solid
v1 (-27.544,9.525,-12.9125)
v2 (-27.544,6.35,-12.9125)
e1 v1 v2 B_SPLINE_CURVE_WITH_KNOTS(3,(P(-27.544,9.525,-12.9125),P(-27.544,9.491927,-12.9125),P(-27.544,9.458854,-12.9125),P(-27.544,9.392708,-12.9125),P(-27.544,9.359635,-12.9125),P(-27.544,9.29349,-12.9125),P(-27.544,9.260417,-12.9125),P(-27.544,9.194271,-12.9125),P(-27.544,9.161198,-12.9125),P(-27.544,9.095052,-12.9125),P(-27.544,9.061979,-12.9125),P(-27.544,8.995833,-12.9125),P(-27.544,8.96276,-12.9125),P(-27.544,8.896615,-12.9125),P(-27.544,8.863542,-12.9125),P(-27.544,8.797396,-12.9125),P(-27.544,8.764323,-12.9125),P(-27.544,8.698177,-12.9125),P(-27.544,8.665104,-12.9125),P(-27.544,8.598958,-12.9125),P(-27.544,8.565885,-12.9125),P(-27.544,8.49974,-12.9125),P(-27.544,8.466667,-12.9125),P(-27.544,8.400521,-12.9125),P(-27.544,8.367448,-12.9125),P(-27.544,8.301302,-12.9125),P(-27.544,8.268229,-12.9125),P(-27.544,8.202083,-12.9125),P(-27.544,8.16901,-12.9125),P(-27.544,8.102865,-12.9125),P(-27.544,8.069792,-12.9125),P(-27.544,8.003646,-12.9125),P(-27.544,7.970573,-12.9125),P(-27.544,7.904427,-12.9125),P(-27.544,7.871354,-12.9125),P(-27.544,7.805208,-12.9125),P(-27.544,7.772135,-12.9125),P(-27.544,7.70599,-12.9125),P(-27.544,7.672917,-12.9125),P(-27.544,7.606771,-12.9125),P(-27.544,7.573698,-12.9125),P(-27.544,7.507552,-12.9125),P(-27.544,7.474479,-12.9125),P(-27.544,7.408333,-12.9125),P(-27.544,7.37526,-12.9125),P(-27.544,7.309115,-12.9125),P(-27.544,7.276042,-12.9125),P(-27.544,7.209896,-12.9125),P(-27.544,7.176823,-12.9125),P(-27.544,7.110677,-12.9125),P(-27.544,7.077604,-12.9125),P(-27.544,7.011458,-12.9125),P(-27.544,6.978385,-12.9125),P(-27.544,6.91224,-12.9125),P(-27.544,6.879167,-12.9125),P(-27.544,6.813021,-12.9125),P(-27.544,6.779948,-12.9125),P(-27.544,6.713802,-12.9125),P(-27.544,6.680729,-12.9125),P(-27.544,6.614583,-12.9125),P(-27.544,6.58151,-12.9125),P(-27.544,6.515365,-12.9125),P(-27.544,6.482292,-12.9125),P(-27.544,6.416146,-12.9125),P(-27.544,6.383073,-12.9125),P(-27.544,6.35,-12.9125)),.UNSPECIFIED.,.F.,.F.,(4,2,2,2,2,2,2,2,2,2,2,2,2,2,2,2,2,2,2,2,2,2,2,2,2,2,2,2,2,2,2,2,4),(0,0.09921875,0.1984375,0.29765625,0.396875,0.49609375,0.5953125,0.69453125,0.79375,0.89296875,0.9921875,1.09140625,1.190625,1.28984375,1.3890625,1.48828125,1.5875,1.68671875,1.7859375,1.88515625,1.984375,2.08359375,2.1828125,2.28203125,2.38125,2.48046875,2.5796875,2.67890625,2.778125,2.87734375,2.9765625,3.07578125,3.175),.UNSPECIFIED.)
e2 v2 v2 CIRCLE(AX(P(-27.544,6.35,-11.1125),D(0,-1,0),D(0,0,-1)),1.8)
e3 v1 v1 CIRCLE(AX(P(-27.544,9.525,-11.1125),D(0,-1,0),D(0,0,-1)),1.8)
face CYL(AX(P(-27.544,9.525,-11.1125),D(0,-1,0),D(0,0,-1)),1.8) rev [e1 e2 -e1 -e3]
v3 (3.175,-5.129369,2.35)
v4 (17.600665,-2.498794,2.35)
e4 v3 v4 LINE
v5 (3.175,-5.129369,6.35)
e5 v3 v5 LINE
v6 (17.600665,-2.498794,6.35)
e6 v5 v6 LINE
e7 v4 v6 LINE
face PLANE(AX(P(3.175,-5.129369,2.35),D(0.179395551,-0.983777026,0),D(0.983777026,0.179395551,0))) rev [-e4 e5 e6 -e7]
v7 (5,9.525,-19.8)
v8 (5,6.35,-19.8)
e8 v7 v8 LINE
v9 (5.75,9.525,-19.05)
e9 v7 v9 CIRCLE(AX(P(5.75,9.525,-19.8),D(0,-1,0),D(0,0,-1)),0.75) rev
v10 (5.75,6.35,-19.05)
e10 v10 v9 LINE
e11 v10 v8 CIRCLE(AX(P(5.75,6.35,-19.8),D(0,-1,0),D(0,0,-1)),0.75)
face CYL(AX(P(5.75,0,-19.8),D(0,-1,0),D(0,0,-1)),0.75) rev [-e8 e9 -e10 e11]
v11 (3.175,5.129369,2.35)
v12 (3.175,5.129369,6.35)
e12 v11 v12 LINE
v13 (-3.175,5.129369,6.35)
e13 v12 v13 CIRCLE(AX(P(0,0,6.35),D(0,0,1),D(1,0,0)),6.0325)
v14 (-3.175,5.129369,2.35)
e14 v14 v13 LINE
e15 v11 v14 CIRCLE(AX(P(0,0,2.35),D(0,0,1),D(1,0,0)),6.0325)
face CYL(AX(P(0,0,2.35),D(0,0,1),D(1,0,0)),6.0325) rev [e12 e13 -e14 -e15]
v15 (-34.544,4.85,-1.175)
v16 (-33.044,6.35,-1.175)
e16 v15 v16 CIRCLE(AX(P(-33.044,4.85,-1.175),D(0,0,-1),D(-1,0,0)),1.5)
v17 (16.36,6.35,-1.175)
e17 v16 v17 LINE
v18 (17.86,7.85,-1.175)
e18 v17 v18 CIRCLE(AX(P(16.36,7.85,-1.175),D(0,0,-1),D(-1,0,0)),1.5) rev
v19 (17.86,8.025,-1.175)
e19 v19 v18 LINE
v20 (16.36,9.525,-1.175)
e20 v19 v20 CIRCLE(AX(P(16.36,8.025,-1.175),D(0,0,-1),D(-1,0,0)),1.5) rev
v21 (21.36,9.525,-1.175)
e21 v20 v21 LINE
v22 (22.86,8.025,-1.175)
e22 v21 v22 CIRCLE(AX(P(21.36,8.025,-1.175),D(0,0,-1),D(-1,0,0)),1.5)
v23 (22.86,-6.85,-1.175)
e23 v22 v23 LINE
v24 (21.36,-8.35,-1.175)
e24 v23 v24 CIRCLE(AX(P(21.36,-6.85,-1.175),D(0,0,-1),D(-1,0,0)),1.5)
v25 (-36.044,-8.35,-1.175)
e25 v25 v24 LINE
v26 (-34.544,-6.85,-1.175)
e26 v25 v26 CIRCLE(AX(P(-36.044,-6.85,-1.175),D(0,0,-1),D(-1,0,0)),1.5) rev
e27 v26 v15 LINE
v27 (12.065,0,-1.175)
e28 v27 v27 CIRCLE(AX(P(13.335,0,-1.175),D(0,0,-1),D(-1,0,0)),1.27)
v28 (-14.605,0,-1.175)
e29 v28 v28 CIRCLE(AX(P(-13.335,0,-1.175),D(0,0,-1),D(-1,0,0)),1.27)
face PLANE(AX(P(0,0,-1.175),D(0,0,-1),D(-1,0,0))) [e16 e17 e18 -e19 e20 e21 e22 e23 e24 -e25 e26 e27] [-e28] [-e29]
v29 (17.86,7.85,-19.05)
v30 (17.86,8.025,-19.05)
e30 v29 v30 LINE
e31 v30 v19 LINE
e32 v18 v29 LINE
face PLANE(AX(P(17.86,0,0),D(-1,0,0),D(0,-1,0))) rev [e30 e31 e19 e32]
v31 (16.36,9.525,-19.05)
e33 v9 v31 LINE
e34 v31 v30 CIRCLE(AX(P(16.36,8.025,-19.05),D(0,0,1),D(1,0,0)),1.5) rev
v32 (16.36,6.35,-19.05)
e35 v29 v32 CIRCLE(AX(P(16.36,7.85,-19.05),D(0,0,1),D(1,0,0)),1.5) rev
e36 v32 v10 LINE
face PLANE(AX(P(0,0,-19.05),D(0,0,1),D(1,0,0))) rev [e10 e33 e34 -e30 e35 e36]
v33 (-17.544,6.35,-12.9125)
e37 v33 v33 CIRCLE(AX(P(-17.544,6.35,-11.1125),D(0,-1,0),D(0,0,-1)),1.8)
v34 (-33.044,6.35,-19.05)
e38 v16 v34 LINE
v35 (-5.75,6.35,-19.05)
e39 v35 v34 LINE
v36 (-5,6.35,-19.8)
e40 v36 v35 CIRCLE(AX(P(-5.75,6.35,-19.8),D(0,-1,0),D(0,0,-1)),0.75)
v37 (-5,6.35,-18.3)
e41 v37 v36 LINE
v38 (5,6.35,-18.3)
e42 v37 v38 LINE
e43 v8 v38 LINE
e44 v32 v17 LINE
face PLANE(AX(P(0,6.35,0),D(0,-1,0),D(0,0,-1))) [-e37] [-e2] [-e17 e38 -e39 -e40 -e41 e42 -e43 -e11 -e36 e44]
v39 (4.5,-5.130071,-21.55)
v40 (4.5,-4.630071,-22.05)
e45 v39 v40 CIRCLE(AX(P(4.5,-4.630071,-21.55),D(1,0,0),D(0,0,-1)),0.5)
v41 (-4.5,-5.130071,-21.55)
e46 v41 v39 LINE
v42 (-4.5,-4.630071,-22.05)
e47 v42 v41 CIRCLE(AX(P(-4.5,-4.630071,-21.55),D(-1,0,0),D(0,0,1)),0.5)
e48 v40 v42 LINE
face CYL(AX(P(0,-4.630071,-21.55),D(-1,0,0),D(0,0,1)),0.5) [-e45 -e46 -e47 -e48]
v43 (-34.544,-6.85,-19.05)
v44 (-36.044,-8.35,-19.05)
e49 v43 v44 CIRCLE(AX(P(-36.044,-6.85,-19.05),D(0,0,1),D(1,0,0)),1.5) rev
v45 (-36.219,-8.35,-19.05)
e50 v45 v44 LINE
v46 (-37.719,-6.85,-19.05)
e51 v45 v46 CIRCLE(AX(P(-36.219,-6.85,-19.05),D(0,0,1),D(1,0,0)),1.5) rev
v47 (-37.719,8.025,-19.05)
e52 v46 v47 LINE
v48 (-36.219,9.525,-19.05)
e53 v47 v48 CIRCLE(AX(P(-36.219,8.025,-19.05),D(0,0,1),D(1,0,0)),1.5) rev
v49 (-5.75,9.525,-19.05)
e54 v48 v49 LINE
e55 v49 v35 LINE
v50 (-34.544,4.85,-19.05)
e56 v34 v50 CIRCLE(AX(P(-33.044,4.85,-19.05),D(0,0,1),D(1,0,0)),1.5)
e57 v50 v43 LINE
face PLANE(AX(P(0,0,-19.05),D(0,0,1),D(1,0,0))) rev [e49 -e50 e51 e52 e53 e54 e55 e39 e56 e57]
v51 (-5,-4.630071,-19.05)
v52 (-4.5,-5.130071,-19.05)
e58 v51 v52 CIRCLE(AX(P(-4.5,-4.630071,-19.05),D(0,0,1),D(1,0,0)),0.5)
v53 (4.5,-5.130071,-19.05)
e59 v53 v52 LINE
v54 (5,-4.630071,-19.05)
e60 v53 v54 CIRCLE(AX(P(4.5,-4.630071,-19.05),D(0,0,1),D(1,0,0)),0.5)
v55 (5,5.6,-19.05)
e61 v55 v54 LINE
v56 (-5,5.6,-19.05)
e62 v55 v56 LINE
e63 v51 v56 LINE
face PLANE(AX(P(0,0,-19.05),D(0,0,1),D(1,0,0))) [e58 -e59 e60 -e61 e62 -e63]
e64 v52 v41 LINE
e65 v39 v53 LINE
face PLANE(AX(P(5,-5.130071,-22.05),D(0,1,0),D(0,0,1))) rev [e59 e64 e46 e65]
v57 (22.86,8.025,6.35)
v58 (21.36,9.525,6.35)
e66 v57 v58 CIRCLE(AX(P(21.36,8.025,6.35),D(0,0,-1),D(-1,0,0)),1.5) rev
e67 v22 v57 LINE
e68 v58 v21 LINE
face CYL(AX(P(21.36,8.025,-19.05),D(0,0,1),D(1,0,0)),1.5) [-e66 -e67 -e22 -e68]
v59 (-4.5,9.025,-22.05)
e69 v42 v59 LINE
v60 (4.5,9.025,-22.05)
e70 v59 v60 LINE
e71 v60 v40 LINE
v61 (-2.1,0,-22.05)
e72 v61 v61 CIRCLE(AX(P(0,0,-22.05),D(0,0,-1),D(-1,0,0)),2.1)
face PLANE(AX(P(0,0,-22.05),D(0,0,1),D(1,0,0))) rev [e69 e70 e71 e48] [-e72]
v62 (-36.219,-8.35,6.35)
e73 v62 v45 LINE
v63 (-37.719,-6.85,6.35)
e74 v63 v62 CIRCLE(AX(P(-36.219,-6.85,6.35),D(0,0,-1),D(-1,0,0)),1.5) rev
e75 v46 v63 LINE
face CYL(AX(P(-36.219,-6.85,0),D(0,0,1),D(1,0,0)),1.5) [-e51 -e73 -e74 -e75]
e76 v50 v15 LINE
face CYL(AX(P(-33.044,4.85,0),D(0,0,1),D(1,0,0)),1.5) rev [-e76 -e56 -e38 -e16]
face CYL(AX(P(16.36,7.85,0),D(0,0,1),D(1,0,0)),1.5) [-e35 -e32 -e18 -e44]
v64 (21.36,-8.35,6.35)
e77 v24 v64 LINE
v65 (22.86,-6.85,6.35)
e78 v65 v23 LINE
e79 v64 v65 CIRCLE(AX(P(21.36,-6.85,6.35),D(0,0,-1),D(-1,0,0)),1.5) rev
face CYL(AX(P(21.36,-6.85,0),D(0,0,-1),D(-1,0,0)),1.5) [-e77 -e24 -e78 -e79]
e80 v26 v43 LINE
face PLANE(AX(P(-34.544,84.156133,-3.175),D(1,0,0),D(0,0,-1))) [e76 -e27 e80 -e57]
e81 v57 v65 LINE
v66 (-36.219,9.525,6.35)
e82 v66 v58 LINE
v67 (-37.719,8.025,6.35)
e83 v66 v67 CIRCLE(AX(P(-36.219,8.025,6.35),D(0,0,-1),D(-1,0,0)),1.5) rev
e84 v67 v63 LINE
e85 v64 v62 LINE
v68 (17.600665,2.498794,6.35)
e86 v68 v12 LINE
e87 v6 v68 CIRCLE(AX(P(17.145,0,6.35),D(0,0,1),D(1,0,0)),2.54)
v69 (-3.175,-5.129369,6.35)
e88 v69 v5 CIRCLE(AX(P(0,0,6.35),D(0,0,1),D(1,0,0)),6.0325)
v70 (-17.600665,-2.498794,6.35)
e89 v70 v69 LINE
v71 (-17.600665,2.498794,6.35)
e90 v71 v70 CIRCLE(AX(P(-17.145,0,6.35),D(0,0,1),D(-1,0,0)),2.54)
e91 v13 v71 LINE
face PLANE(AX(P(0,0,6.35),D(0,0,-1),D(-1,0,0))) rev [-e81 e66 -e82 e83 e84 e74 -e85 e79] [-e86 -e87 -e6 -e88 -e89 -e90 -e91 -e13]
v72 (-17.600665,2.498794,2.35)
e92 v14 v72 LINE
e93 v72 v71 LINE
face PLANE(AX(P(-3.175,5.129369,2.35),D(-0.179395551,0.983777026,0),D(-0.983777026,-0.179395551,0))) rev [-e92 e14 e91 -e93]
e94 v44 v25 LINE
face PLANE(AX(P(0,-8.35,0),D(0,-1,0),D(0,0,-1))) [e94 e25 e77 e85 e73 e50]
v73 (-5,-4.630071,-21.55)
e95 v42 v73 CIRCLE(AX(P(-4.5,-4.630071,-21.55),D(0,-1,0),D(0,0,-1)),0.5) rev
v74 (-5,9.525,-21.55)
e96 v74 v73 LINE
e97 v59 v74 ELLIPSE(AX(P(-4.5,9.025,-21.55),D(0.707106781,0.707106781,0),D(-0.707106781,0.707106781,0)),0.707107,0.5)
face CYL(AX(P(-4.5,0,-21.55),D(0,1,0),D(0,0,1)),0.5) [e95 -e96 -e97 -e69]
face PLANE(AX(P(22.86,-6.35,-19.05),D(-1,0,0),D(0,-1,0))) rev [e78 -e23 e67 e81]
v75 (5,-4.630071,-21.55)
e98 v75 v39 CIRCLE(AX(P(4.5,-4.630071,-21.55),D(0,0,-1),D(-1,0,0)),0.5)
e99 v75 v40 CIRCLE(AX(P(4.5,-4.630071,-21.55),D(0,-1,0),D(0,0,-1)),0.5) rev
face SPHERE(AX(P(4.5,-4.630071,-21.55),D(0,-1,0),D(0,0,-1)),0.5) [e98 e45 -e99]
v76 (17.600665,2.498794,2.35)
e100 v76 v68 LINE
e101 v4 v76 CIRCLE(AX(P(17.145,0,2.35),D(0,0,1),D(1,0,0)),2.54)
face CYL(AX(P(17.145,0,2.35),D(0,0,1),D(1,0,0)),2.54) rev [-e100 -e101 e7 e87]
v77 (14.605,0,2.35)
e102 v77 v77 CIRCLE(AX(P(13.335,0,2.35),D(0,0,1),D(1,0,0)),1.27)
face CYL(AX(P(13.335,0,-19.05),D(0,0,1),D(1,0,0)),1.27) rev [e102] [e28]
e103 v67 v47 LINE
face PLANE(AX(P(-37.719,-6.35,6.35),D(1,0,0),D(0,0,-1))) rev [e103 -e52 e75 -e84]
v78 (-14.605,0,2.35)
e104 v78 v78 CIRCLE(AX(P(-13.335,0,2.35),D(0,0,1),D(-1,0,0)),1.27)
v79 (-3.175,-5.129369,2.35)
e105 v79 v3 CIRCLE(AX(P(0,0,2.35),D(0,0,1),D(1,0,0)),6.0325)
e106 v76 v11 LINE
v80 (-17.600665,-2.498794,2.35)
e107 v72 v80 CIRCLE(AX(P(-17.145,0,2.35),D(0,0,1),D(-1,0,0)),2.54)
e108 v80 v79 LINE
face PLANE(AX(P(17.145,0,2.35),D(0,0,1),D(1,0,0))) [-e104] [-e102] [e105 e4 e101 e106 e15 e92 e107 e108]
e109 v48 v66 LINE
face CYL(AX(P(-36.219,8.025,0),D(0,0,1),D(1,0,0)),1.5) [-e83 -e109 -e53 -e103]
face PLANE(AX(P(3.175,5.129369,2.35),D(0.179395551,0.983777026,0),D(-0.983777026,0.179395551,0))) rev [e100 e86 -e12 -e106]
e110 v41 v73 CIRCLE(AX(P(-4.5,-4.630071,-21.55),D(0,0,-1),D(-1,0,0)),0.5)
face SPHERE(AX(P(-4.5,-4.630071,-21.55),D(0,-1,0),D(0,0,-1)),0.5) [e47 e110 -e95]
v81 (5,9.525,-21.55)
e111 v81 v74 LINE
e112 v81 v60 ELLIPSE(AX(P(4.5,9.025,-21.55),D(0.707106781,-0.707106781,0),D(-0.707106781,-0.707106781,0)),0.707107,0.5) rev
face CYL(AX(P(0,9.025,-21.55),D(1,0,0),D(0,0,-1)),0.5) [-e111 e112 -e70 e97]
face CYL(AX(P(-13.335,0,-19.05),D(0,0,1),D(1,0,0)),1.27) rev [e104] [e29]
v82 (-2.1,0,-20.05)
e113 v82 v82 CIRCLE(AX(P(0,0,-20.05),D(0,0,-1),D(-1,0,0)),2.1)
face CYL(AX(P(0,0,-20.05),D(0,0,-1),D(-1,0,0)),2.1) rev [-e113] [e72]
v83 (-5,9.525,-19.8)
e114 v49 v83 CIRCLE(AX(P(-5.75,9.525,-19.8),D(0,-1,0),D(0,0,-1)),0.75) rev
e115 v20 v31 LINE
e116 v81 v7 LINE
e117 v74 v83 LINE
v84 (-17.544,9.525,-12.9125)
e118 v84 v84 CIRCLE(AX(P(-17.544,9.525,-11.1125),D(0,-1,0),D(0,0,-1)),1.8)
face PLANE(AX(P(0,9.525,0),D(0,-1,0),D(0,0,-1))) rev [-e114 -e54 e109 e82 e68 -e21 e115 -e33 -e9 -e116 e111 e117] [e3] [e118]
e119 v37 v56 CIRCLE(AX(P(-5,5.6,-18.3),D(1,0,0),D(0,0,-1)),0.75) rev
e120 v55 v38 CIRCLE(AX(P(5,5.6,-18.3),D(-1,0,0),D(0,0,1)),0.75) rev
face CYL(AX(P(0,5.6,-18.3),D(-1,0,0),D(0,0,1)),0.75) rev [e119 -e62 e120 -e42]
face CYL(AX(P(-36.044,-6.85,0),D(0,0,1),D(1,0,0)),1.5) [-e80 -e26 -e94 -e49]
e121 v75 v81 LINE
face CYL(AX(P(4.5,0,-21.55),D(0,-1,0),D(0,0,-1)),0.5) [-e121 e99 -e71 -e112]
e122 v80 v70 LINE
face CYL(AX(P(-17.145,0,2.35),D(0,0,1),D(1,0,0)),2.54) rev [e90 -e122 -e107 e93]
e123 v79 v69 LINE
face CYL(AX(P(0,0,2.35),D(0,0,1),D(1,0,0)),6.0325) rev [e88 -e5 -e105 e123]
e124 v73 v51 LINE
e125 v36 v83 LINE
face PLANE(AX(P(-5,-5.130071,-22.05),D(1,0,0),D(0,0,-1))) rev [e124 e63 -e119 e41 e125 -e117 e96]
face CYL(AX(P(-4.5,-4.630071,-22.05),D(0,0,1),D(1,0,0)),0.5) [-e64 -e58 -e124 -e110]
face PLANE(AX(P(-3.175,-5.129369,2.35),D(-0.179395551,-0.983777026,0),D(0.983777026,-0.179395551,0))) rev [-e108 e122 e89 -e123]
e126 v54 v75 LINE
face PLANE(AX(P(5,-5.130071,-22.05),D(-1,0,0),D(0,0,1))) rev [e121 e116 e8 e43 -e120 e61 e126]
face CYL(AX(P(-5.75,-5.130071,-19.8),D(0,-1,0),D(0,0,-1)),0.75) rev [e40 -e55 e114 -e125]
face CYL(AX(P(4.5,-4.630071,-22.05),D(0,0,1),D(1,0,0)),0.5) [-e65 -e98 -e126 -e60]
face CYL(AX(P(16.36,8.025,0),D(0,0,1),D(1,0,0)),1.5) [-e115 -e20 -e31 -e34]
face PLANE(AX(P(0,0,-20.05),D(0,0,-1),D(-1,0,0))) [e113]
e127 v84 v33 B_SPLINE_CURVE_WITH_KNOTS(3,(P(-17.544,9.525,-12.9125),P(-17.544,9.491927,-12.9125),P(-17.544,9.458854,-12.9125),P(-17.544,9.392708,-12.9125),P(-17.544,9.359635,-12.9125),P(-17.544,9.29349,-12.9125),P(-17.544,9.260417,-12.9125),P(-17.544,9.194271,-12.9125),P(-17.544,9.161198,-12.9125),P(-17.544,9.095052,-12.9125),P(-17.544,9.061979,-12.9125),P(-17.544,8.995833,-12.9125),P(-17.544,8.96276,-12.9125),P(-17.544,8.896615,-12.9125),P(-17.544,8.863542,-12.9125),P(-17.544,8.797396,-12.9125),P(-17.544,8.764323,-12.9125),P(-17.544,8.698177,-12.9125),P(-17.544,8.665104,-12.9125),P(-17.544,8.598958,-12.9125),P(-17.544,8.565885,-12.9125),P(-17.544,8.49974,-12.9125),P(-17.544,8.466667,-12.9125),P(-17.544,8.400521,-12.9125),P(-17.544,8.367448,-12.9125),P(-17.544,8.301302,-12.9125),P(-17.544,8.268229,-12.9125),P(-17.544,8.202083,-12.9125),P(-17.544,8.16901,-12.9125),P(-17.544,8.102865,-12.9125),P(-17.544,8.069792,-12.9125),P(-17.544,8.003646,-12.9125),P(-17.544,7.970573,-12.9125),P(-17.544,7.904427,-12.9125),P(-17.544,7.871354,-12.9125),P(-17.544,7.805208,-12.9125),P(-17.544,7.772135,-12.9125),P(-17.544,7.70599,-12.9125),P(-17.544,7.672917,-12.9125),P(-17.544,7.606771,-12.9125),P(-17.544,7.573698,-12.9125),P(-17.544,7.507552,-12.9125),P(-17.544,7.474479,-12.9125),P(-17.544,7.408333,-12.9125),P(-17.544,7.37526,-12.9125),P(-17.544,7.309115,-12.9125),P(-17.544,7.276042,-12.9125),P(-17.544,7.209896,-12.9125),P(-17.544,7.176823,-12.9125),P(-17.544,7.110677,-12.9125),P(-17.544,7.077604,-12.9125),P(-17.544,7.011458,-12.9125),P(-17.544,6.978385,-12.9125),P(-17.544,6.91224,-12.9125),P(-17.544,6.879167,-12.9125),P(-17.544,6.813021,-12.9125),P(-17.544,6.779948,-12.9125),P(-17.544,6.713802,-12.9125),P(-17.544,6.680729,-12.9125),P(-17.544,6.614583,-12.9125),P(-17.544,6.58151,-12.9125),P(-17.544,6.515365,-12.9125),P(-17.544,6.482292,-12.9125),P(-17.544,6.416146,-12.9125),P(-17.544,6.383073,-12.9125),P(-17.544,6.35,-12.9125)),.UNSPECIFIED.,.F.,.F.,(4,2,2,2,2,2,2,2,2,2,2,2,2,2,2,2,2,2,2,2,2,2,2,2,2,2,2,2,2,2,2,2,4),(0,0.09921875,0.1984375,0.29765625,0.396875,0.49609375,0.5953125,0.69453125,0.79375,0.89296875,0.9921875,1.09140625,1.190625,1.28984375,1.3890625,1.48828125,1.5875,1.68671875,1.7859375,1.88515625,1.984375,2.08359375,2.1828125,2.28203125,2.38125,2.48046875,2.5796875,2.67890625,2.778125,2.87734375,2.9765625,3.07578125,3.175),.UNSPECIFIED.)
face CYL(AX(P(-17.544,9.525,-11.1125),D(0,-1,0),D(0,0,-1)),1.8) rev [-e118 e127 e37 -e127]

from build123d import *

# Parameters (mm, degrees)
SKETCH1_W                       = 75.438
SKETCH1_H                       = 12.7
BOSS_EXTRUDE1_DEPTH             = 6.35
CUT_EXTRUDE1_DEPTH              = 4
BOSS_EXTRUDE2_REACH             = 40.773
SKETCH3_W                       = 75.438
SKETCH3_H                       = 19.05
SKETCH3_W_2                     = 69.088
SKETCH3_H_2                     = 12.7
BOSS_EXTRUDE2_DIRECTION_2_REACH = 40.773
SKETCH4_W                       = 75.438
SKETCH4_H                       = 25.4
BOSS_EXTRUDE4_DEPTH             = 3.175
SKETCH7_W                       = 14.859
SKETCH7_H                       = 15.875
CUT_EXTRUDE3_DEPTH              = 47.460828512
SKETCH8_W                       = 3.175
SKETCH8_H                       = 15.875
CUT_EXTRUDE4_DEPTH              = 65.214043371
BOSS_EXTRUDE5_DEPTH             = 3.175
SKETCH11_W                      = 57.404
SKETCH11_H                      = 12.7
CUT_EXTRUDE5_DEPTH              = 2
SKETCH12_R                      = 1.27
CUT_EXTRUDE6_DEPTH              = 45.400547136
SKETCH10_R                      = 1.8
CUT_EXTRUDE7_DEPTH              = 45.123864983
SKETCH13_W                      = 17.875
SKETCH13_H                      = 3.175
CUT_EXTRUDE8_DEPTH              = 5
SKETCH14_W                      = 10
SKETCH14_H                      = 14.655071008
BOSS_EXTRUDE6_DEPTH             = 3
SKETCH15_R                      = 2.1
CUT_EXTRUDE9_DEPTH              = 2
BOSS_EXTRUDE7_DEPTH             = 2
FILLET3_R                       = 0.5
FILLET4_R                       = 0.75
FILLET5_R                       = 0.75
FILLET6_R                       = 0.75
FILLET2_R                       = 1.5


with BuildPart() as part:
    # Sketch1 → Boss-Extrude1 (new body)
    with BuildSketch(Plane.XY):
        Rectangle(SKETCH1_W, SKETCH1_H)
    extrude(amount=BOSS_EXTRUDE1_DEPTH)

    # Sketch2 → Cut-Extrude1 (cut)
    with BuildSketch(Plane.XY.offset(6.35)):
        with BuildLine():
            Line((3.175, 5.129369479), (17.6006647, 2.498793645))
            ThreePointArc((17.6006647, 2.498793645), (19.685, 0), (17.6006647, -2.498793645))
            Line((17.6006647, -2.498793645), (3.175, -5.129369479))
            ThreePointArc((3.175, -5.129369479), (0, -6.0325), (-3.175, -5.129369479))
            Line((-3.175, -5.129369479), (-17.6006647, -2.498793645))
            ThreePointArc((-17.6006647, -2.498793645), (-19.685, 0), (-17.6006647, 2.498793645))
            Line((-17.6006647, 2.498793645), (-3.175, 5.129369479))
            ThreePointArc((-3.175, 5.129369479), (0, 6.0325), (3.175, 5.129369479))
        make_face()
    extrude(amount=-CUT_EXTRUDE1_DEPTH, mode=Mode.SUBTRACT)

    # Boss-Extrude2: up to this face of the body (flat: up to its plane)
    boss_extrude2_end = Plane(part.part.faces().sort_by_distance((0, 6.35, 3.175))[0])
    # Sketch3 → Boss-Extrude2 (add, up to the picked face)
    with BuildSketch(Plane(origin=(0, 0, 0), x_dir=(1, 0, 0), z_dir=(0, 1, 0)), mode=Mode.PRIVATE) as boss_extrude2_sk1:
        with Locations((0, 9.525)):
            Rectangle(SKETCH3_W, SKETCH3_H)
        with Locations((0, 9.525)):
            Rectangle(SKETCH3_W_2, SKETCH3_H_2, mode=Mode.SUBTRACT)
    boss_extrude2_tool1 = split(extrude(boss_extrude2_sk1.sketch, amount=BOSS_EXTRUDE2_REACH, mode=Mode.PRIVATE), bisect_by=boss_extrude2_end, keep=Keep.BOTH, mode=Mode.PRIVATE)
    add(boss_extrude2_tool1.solids().sort_by(Axis((0, 0, -0.778061), (0, 1, 0)))[0])

    # Boss-Extrude2 direction 2: up to this face of the body (flat: up to its plane)
    boss_extrude2_direction_2_end = Plane(part.part.faces().sort_by_distance((0, -6.35, 3.175))[0])
    # Sketch3 → Boss-Extrude2 direction 2 (add, up to the picked face)
    with BuildSketch(Plane(origin=(0, 0, 0), x_dir=(1, 0, 0), z_dir=(0, 1, 0)), mode=Mode.PRIVATE) as boss_extrude2_direction_2_sk1:
        with Locations((0, 9.525)):
            Rectangle(SKETCH3_W, SKETCH3_H)
        with Locations((0, 9.525)):
            Rectangle(SKETCH3_W_2, SKETCH3_H_2, mode=Mode.SUBTRACT)
    boss_extrude2_direction_2_tool1 = split(extrude(boss_extrude2_direction_2_sk1.sketch, amount=-BOSS_EXTRUDE2_DIRECTION_2_REACH, mode=Mode.PRIVATE), bisect_by=boss_extrude2_direction_2_end, keep=Keep.BOTH, mode=Mode.PRIVATE)
    add(boss_extrude2_direction_2_tool1.solids().sort_by(Axis((0, 0, -0.778061), (0, -1, 0)))[0])

    # Sketch4 → Boss-Extrude4 (add)
    with BuildSketch(Plane(origin=(0, 6.35, 0), x_dir=(1, 0, 0), z_dir=(0, 1, 0))):
        with Locations((0, 6.35)):
            Rectangle(SKETCH4_W, SKETCH4_H)
    extrude(amount=BOSS_EXTRUDE4_DEPTH)

    # Sketch7 → Cut-Extrude3 (cut, through all)
    with BuildSketch(Plane.XY.offset(6.35)):
        with Locations((30.2895, 1.5875)):
            Rectangle(SKETCH7_W, SKETCH7_H)
    extrude(amount=-CUT_EXTRUDE3_DEPTH, mode=Mode.SUBTRACT)

    # Sketch8 → Cut-Extrude4 (cut, through all)
    with BuildSketch(Plane(origin=(22.86, 0, 0), x_dir=(0, 0, -1), z_dir=(1, 0, 0))):
        with Locations((17.4625, 1.5875)):
            Rectangle(SKETCH8_W, SKETCH8_H)
    extrude(amount=-CUT_EXTRUDE4_DEPTH, mode=Mode.SUBTRACT)

    # Sketch9 → Boss-Extrude5 (add)
    with BuildSketch(Plane(origin=(0, 0, -15.875), x_dir=(-1, 0, 0), z_dir=(0, 0, -1))):
        Polygon((34.544, 6.35), (34.544, -6.35), (37.719, -6.35), (37.719, 9.525), (-22.86, 9.525), (-22.86, 6.35), align=None)
    extrude(amount=BOSS_EXTRUDE5_DEPTH)

    # Sketch11 → Cut-Extrude5 (cut)
    with BuildSketch(Plane(origin=(0, 0, -3.175), x_dir=(-1, 0, 0), z_dir=(0, 0, -1))):
        with Locations((5.842, 0)):
            Rectangle(SKETCH11_W, SKETCH11_H)
    extrude(amount=-CUT_EXTRUDE5_DEPTH, mode=Mode.SUBTRACT)

    # Sketch12 → Cut-Extrude6 (cut, through all)
    with BuildSketch(Plane.XY.offset(2.35)):
        with Locations((13.335, 0)):
            Circle(SKETCH12_R)
        with Locations(Location((-13.335, 0, 0), (0, 0, 180))):
            Circle(SKETCH12_R)
    extrude(amount=-CUT_EXTRUDE6_DEPTH, mode=Mode.SUBTRACT)

    # Sketch10 → Cut-Extrude7 (cut, through all)
    with BuildSketch(Plane.XZ.offset(-6.35)):
        with Locations(Location((-27.544, -11.1125, 0), (0, 0, 270))):
            Circle(SKETCH10_R)
        with Locations(Location((-17.544, -11.1125, 0), (0, 0, 270))):
            Circle(SKETCH10_R)
    extrude(amount=-CUT_EXTRUDE7_DEPTH, mode=Mode.SUBTRACT)

    # Sketch13 → Cut-Extrude8 (cut)
    with BuildSketch(Plane(origin=(22.86, 0, 0), x_dir=(0, 0, -1), z_dir=(1, 0, 0))):
        with Locations((10.1125, 7.9375)):
            Rectangle(SKETCH13_W, SKETCH13_H)
    extrude(amount=-CUT_EXTRUDE8_DEPTH, mode=Mode.SUBTRACT)

    # Sketch14 → Boss-Extrude6 (add)
    with BuildSketch(Plane(origin=(0, 0, -19.05), x_dir=(-1, 0, 0), z_dir=(0, 0, -1))):
        with Locations((0, 2.197464496)):
            Rectangle(SKETCH14_W, SKETCH14_H)
    extrude(amount=BOSS_EXTRUDE6_DEPTH)

    # Sketch15 → Cut-Extrude9 (cut)
    with BuildSketch(Plane(origin=(0, 0, -22.05), x_dir=(-1, 0, 0), z_dir=(0, 0, -1))):
        Circle(SKETCH15_R)
    extrude(amount=-CUT_EXTRUDE9_DEPTH, mode=Mode.SUBTRACT)

    # Sketch16 → Boss-Extrude7 (add)
    with BuildSketch(Plane.XZ.offset(6.35)):
        Polygon((-34.544, -19.05), (-34.544, -1.175), (22.86, -1.175), (22.86, 6.35), (-37.719, 6.35), (-37.719, -19.05), align=None)
    extrude(amount=BOSS_EXTRUDE7_DEPTH)

    # Fillet3
    fillet3_edges = [part.edges().sort_by_distance(p)[0] for p in [
        (-5, -5.130071008, -20.55),
        (5, -5.130071008, -20.55),
        (-5, 2.197464496, -22.05),
        (0, 9.525, -22.05),
        (5, 2.197464496, -22.05),
        (0, -5.130071008, -22.05),
    ]]
    fillet(fillet3_edges, radius=FILLET3_R)

    # Fillet4
    # the kernel refuses this fillet: 0.75 mm, written as the material it adds along each edge
    with BuildSketch(Plane(origin=(5, 9.525, -19.05), x_dir=(0, 0, -1), z_dir=(0, -1, 0))) as fillet4_piece_1:
        with BuildLine():
            CenterArc((FILLET4_R, FILLET4_R), FILLET4_R, 180, 90)
            Line((0, FILLET4_R), (0, 0))
            Line((0, 0), (FILLET4_R, 0))
        make_face()
    extrude(amount=3.175)

    # Fillet5
    # the kernel refuses this fillet: 0.75 mm, written as the material it adds along each edge
    with BuildSketch(Plane(origin=(-5, 6.35, -19.05), x_dir=(0, 0, -1), z_dir=(0, 1, 0))) as fillet5_piece_1:
        with BuildLine():
            CenterArc((FILLET5_R, FILLET5_R), FILLET5_R, 180, 90)
            Line((0, FILLET5_R), (0, 0))
            Line((0, 0), (FILLET5_R, 0))
        make_face()
    extrude(amount=3.175)

    # Fillet6
    fillet6_edges = [part.edges().sort_by_distance(p)[0] for p in [
        (0, 6.35, -19.05),
    ]]
    fillet(fillet6_edges, radius=FILLET6_R)

    # Fillet2
    fillet2_edges = [part.edges().sort_by_distance(p)[0] for p in [
        (22.86, 9.525, 2.5875),
        (17.86, 9.525, -10.1125),
        (17.86, 6.35, -10.1125),
        (-34.544, -8.35, -10.1125),
        (22.86, -8.35, 2.5875),
        (-37.719, -8.35, -6.35),
        (-34.544, 6.35, -10.1125),
        (-37.719, 9.525, -6.35),
    ]]
    fillet(fillet2_edges, radius=FILLET2_R)


solid = part.part
